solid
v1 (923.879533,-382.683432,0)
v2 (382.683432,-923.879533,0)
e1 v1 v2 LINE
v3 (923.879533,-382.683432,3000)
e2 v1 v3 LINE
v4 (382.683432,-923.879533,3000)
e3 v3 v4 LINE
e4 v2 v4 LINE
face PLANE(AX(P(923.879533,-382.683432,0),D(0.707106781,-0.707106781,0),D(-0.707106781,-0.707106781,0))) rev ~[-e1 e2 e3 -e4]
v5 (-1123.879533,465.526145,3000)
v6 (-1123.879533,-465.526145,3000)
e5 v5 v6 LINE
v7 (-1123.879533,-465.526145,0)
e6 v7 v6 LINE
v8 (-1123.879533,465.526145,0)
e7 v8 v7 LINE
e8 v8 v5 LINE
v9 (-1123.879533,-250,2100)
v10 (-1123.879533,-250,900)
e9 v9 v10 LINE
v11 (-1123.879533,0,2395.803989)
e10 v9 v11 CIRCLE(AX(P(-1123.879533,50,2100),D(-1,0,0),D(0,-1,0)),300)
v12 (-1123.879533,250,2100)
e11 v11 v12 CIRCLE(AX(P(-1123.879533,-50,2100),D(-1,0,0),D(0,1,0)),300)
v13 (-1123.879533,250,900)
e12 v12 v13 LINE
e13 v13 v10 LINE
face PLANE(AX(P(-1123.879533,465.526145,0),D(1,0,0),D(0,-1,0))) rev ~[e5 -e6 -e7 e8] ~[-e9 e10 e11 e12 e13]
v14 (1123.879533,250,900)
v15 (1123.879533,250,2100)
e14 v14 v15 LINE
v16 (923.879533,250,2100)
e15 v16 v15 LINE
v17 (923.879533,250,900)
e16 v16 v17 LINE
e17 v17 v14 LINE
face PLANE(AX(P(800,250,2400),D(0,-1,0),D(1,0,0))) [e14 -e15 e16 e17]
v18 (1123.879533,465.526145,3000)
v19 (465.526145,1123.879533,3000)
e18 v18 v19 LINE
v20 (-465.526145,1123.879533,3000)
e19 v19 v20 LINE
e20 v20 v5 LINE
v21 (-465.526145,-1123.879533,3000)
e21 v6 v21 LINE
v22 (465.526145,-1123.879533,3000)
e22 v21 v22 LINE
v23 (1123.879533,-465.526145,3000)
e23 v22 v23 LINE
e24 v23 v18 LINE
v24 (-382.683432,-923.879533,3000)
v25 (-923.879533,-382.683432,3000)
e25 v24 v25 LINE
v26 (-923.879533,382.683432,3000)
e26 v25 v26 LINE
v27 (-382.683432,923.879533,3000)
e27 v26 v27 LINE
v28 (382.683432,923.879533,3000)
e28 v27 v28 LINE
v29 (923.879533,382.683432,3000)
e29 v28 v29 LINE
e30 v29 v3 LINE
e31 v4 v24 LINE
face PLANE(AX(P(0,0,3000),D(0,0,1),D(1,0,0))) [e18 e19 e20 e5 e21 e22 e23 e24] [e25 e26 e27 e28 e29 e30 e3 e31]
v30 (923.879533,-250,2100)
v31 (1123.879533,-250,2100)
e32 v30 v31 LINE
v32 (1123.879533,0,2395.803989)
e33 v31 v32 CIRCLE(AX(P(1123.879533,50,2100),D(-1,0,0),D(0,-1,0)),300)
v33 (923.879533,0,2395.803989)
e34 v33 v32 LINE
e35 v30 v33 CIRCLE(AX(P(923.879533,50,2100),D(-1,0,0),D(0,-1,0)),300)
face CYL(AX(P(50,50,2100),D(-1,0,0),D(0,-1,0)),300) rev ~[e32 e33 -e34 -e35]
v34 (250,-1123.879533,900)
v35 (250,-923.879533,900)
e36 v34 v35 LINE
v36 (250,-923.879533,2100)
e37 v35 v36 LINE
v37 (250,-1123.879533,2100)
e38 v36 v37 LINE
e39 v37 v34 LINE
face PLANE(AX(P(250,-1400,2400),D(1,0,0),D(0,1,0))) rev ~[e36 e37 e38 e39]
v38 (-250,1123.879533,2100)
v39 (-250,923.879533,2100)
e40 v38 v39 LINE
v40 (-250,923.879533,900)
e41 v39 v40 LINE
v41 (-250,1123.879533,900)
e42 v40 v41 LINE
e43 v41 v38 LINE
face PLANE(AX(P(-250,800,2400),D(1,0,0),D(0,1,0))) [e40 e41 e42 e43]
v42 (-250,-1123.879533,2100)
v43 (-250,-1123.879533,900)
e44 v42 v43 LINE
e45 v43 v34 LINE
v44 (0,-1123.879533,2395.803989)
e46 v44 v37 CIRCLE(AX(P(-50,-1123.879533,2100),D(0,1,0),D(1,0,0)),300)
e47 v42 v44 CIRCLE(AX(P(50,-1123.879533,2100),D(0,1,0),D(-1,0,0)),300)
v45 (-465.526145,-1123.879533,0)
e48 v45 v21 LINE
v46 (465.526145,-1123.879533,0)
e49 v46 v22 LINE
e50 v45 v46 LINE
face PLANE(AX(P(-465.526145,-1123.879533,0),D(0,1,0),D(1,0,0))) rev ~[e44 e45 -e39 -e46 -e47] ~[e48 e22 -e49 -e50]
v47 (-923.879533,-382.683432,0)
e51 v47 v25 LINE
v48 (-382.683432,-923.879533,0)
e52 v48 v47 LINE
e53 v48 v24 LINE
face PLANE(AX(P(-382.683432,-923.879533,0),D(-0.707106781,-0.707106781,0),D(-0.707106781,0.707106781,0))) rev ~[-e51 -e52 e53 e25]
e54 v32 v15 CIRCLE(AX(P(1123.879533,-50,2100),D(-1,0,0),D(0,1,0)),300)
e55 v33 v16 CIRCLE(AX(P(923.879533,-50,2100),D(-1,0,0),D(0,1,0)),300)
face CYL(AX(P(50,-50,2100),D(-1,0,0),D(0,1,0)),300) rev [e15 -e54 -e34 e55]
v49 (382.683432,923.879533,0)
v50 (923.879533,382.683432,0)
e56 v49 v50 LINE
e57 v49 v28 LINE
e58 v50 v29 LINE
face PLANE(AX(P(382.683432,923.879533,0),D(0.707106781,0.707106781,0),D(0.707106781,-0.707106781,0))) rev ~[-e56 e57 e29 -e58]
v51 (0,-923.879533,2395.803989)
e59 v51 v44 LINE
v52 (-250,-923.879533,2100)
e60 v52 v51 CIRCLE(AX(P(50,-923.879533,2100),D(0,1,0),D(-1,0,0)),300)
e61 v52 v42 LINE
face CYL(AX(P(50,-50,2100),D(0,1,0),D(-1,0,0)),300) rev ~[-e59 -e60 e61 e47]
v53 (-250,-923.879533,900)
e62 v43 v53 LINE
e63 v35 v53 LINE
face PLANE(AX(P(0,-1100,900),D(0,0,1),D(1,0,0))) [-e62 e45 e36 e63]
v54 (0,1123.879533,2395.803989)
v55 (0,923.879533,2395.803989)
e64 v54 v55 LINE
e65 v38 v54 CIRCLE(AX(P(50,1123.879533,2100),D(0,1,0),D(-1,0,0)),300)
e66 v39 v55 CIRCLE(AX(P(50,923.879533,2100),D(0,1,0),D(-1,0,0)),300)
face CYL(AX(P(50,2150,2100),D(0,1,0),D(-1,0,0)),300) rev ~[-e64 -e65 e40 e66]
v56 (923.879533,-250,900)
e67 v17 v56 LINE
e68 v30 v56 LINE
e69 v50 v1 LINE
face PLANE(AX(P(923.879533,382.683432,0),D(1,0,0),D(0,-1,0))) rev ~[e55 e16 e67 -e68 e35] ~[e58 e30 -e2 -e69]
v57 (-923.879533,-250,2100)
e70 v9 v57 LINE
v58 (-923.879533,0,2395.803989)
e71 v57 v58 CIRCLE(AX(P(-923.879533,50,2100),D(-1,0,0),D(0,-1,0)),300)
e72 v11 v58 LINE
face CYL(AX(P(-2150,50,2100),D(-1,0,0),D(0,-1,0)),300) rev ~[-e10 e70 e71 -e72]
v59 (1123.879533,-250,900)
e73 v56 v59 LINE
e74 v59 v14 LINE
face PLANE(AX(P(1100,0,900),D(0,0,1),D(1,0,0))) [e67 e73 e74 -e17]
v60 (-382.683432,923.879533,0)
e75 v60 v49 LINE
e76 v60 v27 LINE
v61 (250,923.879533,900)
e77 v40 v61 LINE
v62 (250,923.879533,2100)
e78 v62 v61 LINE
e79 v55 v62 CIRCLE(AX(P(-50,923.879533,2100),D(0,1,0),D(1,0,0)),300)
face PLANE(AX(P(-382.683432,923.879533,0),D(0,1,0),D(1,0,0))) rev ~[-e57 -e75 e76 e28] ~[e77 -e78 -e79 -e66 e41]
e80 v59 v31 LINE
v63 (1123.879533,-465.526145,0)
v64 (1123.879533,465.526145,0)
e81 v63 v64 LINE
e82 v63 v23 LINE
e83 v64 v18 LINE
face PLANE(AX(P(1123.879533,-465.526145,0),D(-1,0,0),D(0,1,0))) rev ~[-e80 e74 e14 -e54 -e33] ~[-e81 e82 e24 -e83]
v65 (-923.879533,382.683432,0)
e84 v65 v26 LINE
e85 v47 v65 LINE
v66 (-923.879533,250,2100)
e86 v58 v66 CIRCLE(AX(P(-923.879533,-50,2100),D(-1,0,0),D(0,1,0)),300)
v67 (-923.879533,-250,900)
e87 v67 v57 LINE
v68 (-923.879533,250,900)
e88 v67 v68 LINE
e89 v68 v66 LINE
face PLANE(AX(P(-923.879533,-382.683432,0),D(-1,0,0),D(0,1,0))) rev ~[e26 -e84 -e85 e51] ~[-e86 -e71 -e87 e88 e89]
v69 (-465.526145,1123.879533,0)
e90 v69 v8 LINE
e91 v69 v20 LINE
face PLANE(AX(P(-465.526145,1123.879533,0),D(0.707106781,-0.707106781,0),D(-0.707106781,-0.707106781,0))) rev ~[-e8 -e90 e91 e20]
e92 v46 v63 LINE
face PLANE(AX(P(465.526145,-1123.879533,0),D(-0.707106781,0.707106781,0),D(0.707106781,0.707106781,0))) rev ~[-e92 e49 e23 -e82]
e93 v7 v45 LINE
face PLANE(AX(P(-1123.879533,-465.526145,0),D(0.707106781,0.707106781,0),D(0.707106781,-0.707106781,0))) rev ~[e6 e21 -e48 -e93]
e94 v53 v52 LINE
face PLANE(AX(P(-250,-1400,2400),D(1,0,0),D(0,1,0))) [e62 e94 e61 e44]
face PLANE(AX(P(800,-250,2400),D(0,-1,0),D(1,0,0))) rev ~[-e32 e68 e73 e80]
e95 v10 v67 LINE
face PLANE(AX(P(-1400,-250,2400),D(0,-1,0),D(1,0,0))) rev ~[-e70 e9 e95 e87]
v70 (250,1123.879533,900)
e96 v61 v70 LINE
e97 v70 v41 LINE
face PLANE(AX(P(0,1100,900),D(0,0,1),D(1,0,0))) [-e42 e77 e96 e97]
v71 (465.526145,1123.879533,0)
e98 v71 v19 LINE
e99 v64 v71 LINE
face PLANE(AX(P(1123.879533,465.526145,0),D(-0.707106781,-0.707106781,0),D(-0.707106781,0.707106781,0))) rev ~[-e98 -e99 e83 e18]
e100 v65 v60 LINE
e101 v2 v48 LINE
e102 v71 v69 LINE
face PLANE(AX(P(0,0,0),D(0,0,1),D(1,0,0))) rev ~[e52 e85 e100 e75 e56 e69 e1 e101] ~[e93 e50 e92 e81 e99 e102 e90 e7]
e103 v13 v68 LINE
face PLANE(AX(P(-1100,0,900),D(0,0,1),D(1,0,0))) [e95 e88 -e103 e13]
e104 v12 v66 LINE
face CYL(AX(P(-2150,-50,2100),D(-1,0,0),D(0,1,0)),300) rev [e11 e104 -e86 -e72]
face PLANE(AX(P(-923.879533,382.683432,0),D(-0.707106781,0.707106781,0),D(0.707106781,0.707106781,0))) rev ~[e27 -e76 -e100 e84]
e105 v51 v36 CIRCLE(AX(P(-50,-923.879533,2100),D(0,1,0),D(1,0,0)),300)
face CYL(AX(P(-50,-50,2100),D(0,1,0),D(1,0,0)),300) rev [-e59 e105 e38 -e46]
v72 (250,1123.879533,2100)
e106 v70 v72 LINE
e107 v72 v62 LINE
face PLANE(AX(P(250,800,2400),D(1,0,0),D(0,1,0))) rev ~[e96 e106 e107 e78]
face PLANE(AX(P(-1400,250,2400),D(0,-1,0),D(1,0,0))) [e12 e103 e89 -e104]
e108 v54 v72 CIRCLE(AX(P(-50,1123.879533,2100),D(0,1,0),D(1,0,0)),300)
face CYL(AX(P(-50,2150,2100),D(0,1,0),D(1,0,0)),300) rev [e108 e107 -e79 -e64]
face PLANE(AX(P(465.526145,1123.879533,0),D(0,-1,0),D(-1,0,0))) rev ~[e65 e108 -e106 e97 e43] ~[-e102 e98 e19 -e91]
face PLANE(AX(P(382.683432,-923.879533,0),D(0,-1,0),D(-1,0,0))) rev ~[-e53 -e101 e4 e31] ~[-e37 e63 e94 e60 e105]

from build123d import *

# Parameters (mm, degrees)
F2_DEPTH      = 3000
F4_START      = -600
F3_W          = 600
F3_H          = 500
F4_DEPTH      = 1500
F3_W_2        = 500
F3_H_2        = 600
F5_T1_DEPTH   = 2100
F5_2_T1_DEPTH = 2100
F5_3_T1_DEPTH = 2100
F5_4_T1_DEPTH = 2100


# Not quite as in the source:
# - a fillet or chamfer that OpenCascade refuses, or shapes differently, is made with other operations: its cross-section is extruded or revolved along the edge and cut away or added
# - a feature names something its author has since deleted; it is built from what else it names


with BuildPart() as f2:
    # F1 (on Top) → F2 (new body)
    with BuildSketch(Plane.XY):
        Polygon((1123.8795325113, 465.5261448397), (465.5261448397, 1123.8795325113), (-465.5261448397, 1123.8795325113), (-1123.8795325113, 465.5261448397), (-1123.8795325113, -465.5261448397), (-465.5261448397, -1123.8795325113), (465.5261448397, -1123.8795325113), (1123.8795325113, -465.5261448397), align=None)
        Polygon((-923.8795325113, 382.6834323651), (-382.6834323651, 923.8795325113), (382.6834323651, 923.8795325113), (923.8795325113, 382.6834323651), (923.8795325113, -382.6834323651), (382.6834323651, -923.8795325113), (-382.6834323651, -923.8795325113), (-923.8795325113, -382.6834323651), align=None, mode=Mode.SUBTRACT)
    extrude(amount=F2_DEPTH)


with BuildPart() as f4:
    # F3 (on face) → F4 (new body)
    with BuildSketch(Plane.XY.offset(3000).offset(F4_START)):
        with Locations((1100, 0)):
            Rectangle(F3_W, F3_H)
    extrude(amount=-F4_DEPTH)

    # F5#4: fillet of radius 300 on 2 edges, made by hand

    # F5_4_s2 → F5_4_t1 (cut)
    with BuildSketch(Plane.YZ.offset(50)):
        with BuildLine():
            ThreePointArc((-250, 2100), (-162.132034356, 2312.132034356), (50, 2400))
            Line((50, 2400), (-250, 2400))
            Line((-250, 2400), (-250, 2100))
        make_face()
        with BuildLine():
            ThreePointArc((250, 2100), (162.132034356, 2312.132034356), (-50, 2400))
            Line((-50, 2400), (250, 2400))
            Line((250, 2400), (250, 2100))
        make_face()
    extrude(amount=F5_4_T1_DEPTH, mode=Mode.SUBTRACT)


with BuildPart() as f4b:
    # F3 (on face) → F4, piece 2 (new body)
    with BuildSketch(Plane.XY.offset(3000).offset(F4_START)):
        with Locations((0, 1100)):
            Rectangle(F3_W_2, F3_H_2)
    extrude(amount=-F4_DEPTH)

    # F5: fillet of radius 300 on 2 edges, made by hand

    # F5_s2 → F5_t1 (cut)
    with BuildSketch(Plane.XZ.offset(-2150)):
        with BuildLine():
            ThreePointArc((-250, 2100), (-162.132034356, 2312.132034356), (50, 2400))
            Line((50, 2400), (-250, 2400))
            Line((-250, 2400), (-250, 2100))
        make_face()
        with BuildLine():
            ThreePointArc((250, 2100), (162.132034356, 2312.132034356), (-50, 2400))
            Line((-50, 2400), (250, 2400))
            Line((250, 2400), (250, 2100))
        make_face()
    extrude(amount=F5_T1_DEPTH, mode=Mode.SUBTRACT)


with BuildPart() as f4c:
    # F3 (on face) → F4, piece 3 (new body)
    with BuildSketch(Plane.XY.offset(3000).offset(F4_START)):
        with Locations((-1100, 0)):
            Rectangle(F3_W, F3_H)
    extrude(amount=-F4_DEPTH)

    # F5#2: fillet of radius 300 on 2 edges, made by hand

    # F5_2_s2 → F5_2_t1 (cut)
    with BuildSketch(Plane.YZ.offset(-2150)):
        with BuildLine():
            ThreePointArc((250, 2100), (162.132034356, 2312.132034356), (-50, 2400))
            Line((-50, 2400), (250, 2400))
            Line((250, 2400), (250, 2100))
        make_face()
        with BuildLine():
            ThreePointArc((-250, 2100), (-162.132034356, 2312.132034356), (50, 2400))
            Line((50, 2400), (-250, 2400))
            Line((-250, 2400), (-250, 2100))
        make_face()
    extrude(amount=F5_2_T1_DEPTH, mode=Mode.SUBTRACT)


with BuildPart() as f4d:
    # F3 (on face) → F4, piece 4 (new body)
    with BuildSketch(Plane.XY.offset(3000).offset(F4_START)):
        with Locations((0, -1100)):
            Rectangle(F3_W_2, F3_H_2)
    extrude(amount=-F4_DEPTH)

    # F5#3: fillet of radius 300 on 2 edges, made by hand

    # F5_3_s2 → F5_3_t1 (cut)
    with BuildSketch(Plane.XZ.offset(50)):
        with BuildLine():
            ThreePointArc((-250, 2100), (-162.132034356, 2312.132034356), (50, 2400))
            Line((50, 2400), (-250, 2400))
            Line((-250, 2400), (-250, 2100))
        make_face()
        with BuildLine():
            ThreePointArc((250, 2100), (162.132034356, 2312.132034356), (-50, 2400))
            Line((-50, 2400), (250, 2400))
            Line((250, 2400), (250, 2100))
        make_face()
    extrude(amount=F5_3_T1_DEPTH, mode=Mode.SUBTRACT)


with BuildPart() as f2_1:
    add(f2.part)

    # F6: cut F4, F4b, F4c, F4d
    add(f4.part, mode=Mode.SUBTRACT)
    add(f4b.part, mode=Mode.SUBTRACT)
    add(f4c.part, mode=Mode.SUBTRACT)
    add(f4d.part, mode=Mode.SUBTRACT)


solid = f2_1.part
